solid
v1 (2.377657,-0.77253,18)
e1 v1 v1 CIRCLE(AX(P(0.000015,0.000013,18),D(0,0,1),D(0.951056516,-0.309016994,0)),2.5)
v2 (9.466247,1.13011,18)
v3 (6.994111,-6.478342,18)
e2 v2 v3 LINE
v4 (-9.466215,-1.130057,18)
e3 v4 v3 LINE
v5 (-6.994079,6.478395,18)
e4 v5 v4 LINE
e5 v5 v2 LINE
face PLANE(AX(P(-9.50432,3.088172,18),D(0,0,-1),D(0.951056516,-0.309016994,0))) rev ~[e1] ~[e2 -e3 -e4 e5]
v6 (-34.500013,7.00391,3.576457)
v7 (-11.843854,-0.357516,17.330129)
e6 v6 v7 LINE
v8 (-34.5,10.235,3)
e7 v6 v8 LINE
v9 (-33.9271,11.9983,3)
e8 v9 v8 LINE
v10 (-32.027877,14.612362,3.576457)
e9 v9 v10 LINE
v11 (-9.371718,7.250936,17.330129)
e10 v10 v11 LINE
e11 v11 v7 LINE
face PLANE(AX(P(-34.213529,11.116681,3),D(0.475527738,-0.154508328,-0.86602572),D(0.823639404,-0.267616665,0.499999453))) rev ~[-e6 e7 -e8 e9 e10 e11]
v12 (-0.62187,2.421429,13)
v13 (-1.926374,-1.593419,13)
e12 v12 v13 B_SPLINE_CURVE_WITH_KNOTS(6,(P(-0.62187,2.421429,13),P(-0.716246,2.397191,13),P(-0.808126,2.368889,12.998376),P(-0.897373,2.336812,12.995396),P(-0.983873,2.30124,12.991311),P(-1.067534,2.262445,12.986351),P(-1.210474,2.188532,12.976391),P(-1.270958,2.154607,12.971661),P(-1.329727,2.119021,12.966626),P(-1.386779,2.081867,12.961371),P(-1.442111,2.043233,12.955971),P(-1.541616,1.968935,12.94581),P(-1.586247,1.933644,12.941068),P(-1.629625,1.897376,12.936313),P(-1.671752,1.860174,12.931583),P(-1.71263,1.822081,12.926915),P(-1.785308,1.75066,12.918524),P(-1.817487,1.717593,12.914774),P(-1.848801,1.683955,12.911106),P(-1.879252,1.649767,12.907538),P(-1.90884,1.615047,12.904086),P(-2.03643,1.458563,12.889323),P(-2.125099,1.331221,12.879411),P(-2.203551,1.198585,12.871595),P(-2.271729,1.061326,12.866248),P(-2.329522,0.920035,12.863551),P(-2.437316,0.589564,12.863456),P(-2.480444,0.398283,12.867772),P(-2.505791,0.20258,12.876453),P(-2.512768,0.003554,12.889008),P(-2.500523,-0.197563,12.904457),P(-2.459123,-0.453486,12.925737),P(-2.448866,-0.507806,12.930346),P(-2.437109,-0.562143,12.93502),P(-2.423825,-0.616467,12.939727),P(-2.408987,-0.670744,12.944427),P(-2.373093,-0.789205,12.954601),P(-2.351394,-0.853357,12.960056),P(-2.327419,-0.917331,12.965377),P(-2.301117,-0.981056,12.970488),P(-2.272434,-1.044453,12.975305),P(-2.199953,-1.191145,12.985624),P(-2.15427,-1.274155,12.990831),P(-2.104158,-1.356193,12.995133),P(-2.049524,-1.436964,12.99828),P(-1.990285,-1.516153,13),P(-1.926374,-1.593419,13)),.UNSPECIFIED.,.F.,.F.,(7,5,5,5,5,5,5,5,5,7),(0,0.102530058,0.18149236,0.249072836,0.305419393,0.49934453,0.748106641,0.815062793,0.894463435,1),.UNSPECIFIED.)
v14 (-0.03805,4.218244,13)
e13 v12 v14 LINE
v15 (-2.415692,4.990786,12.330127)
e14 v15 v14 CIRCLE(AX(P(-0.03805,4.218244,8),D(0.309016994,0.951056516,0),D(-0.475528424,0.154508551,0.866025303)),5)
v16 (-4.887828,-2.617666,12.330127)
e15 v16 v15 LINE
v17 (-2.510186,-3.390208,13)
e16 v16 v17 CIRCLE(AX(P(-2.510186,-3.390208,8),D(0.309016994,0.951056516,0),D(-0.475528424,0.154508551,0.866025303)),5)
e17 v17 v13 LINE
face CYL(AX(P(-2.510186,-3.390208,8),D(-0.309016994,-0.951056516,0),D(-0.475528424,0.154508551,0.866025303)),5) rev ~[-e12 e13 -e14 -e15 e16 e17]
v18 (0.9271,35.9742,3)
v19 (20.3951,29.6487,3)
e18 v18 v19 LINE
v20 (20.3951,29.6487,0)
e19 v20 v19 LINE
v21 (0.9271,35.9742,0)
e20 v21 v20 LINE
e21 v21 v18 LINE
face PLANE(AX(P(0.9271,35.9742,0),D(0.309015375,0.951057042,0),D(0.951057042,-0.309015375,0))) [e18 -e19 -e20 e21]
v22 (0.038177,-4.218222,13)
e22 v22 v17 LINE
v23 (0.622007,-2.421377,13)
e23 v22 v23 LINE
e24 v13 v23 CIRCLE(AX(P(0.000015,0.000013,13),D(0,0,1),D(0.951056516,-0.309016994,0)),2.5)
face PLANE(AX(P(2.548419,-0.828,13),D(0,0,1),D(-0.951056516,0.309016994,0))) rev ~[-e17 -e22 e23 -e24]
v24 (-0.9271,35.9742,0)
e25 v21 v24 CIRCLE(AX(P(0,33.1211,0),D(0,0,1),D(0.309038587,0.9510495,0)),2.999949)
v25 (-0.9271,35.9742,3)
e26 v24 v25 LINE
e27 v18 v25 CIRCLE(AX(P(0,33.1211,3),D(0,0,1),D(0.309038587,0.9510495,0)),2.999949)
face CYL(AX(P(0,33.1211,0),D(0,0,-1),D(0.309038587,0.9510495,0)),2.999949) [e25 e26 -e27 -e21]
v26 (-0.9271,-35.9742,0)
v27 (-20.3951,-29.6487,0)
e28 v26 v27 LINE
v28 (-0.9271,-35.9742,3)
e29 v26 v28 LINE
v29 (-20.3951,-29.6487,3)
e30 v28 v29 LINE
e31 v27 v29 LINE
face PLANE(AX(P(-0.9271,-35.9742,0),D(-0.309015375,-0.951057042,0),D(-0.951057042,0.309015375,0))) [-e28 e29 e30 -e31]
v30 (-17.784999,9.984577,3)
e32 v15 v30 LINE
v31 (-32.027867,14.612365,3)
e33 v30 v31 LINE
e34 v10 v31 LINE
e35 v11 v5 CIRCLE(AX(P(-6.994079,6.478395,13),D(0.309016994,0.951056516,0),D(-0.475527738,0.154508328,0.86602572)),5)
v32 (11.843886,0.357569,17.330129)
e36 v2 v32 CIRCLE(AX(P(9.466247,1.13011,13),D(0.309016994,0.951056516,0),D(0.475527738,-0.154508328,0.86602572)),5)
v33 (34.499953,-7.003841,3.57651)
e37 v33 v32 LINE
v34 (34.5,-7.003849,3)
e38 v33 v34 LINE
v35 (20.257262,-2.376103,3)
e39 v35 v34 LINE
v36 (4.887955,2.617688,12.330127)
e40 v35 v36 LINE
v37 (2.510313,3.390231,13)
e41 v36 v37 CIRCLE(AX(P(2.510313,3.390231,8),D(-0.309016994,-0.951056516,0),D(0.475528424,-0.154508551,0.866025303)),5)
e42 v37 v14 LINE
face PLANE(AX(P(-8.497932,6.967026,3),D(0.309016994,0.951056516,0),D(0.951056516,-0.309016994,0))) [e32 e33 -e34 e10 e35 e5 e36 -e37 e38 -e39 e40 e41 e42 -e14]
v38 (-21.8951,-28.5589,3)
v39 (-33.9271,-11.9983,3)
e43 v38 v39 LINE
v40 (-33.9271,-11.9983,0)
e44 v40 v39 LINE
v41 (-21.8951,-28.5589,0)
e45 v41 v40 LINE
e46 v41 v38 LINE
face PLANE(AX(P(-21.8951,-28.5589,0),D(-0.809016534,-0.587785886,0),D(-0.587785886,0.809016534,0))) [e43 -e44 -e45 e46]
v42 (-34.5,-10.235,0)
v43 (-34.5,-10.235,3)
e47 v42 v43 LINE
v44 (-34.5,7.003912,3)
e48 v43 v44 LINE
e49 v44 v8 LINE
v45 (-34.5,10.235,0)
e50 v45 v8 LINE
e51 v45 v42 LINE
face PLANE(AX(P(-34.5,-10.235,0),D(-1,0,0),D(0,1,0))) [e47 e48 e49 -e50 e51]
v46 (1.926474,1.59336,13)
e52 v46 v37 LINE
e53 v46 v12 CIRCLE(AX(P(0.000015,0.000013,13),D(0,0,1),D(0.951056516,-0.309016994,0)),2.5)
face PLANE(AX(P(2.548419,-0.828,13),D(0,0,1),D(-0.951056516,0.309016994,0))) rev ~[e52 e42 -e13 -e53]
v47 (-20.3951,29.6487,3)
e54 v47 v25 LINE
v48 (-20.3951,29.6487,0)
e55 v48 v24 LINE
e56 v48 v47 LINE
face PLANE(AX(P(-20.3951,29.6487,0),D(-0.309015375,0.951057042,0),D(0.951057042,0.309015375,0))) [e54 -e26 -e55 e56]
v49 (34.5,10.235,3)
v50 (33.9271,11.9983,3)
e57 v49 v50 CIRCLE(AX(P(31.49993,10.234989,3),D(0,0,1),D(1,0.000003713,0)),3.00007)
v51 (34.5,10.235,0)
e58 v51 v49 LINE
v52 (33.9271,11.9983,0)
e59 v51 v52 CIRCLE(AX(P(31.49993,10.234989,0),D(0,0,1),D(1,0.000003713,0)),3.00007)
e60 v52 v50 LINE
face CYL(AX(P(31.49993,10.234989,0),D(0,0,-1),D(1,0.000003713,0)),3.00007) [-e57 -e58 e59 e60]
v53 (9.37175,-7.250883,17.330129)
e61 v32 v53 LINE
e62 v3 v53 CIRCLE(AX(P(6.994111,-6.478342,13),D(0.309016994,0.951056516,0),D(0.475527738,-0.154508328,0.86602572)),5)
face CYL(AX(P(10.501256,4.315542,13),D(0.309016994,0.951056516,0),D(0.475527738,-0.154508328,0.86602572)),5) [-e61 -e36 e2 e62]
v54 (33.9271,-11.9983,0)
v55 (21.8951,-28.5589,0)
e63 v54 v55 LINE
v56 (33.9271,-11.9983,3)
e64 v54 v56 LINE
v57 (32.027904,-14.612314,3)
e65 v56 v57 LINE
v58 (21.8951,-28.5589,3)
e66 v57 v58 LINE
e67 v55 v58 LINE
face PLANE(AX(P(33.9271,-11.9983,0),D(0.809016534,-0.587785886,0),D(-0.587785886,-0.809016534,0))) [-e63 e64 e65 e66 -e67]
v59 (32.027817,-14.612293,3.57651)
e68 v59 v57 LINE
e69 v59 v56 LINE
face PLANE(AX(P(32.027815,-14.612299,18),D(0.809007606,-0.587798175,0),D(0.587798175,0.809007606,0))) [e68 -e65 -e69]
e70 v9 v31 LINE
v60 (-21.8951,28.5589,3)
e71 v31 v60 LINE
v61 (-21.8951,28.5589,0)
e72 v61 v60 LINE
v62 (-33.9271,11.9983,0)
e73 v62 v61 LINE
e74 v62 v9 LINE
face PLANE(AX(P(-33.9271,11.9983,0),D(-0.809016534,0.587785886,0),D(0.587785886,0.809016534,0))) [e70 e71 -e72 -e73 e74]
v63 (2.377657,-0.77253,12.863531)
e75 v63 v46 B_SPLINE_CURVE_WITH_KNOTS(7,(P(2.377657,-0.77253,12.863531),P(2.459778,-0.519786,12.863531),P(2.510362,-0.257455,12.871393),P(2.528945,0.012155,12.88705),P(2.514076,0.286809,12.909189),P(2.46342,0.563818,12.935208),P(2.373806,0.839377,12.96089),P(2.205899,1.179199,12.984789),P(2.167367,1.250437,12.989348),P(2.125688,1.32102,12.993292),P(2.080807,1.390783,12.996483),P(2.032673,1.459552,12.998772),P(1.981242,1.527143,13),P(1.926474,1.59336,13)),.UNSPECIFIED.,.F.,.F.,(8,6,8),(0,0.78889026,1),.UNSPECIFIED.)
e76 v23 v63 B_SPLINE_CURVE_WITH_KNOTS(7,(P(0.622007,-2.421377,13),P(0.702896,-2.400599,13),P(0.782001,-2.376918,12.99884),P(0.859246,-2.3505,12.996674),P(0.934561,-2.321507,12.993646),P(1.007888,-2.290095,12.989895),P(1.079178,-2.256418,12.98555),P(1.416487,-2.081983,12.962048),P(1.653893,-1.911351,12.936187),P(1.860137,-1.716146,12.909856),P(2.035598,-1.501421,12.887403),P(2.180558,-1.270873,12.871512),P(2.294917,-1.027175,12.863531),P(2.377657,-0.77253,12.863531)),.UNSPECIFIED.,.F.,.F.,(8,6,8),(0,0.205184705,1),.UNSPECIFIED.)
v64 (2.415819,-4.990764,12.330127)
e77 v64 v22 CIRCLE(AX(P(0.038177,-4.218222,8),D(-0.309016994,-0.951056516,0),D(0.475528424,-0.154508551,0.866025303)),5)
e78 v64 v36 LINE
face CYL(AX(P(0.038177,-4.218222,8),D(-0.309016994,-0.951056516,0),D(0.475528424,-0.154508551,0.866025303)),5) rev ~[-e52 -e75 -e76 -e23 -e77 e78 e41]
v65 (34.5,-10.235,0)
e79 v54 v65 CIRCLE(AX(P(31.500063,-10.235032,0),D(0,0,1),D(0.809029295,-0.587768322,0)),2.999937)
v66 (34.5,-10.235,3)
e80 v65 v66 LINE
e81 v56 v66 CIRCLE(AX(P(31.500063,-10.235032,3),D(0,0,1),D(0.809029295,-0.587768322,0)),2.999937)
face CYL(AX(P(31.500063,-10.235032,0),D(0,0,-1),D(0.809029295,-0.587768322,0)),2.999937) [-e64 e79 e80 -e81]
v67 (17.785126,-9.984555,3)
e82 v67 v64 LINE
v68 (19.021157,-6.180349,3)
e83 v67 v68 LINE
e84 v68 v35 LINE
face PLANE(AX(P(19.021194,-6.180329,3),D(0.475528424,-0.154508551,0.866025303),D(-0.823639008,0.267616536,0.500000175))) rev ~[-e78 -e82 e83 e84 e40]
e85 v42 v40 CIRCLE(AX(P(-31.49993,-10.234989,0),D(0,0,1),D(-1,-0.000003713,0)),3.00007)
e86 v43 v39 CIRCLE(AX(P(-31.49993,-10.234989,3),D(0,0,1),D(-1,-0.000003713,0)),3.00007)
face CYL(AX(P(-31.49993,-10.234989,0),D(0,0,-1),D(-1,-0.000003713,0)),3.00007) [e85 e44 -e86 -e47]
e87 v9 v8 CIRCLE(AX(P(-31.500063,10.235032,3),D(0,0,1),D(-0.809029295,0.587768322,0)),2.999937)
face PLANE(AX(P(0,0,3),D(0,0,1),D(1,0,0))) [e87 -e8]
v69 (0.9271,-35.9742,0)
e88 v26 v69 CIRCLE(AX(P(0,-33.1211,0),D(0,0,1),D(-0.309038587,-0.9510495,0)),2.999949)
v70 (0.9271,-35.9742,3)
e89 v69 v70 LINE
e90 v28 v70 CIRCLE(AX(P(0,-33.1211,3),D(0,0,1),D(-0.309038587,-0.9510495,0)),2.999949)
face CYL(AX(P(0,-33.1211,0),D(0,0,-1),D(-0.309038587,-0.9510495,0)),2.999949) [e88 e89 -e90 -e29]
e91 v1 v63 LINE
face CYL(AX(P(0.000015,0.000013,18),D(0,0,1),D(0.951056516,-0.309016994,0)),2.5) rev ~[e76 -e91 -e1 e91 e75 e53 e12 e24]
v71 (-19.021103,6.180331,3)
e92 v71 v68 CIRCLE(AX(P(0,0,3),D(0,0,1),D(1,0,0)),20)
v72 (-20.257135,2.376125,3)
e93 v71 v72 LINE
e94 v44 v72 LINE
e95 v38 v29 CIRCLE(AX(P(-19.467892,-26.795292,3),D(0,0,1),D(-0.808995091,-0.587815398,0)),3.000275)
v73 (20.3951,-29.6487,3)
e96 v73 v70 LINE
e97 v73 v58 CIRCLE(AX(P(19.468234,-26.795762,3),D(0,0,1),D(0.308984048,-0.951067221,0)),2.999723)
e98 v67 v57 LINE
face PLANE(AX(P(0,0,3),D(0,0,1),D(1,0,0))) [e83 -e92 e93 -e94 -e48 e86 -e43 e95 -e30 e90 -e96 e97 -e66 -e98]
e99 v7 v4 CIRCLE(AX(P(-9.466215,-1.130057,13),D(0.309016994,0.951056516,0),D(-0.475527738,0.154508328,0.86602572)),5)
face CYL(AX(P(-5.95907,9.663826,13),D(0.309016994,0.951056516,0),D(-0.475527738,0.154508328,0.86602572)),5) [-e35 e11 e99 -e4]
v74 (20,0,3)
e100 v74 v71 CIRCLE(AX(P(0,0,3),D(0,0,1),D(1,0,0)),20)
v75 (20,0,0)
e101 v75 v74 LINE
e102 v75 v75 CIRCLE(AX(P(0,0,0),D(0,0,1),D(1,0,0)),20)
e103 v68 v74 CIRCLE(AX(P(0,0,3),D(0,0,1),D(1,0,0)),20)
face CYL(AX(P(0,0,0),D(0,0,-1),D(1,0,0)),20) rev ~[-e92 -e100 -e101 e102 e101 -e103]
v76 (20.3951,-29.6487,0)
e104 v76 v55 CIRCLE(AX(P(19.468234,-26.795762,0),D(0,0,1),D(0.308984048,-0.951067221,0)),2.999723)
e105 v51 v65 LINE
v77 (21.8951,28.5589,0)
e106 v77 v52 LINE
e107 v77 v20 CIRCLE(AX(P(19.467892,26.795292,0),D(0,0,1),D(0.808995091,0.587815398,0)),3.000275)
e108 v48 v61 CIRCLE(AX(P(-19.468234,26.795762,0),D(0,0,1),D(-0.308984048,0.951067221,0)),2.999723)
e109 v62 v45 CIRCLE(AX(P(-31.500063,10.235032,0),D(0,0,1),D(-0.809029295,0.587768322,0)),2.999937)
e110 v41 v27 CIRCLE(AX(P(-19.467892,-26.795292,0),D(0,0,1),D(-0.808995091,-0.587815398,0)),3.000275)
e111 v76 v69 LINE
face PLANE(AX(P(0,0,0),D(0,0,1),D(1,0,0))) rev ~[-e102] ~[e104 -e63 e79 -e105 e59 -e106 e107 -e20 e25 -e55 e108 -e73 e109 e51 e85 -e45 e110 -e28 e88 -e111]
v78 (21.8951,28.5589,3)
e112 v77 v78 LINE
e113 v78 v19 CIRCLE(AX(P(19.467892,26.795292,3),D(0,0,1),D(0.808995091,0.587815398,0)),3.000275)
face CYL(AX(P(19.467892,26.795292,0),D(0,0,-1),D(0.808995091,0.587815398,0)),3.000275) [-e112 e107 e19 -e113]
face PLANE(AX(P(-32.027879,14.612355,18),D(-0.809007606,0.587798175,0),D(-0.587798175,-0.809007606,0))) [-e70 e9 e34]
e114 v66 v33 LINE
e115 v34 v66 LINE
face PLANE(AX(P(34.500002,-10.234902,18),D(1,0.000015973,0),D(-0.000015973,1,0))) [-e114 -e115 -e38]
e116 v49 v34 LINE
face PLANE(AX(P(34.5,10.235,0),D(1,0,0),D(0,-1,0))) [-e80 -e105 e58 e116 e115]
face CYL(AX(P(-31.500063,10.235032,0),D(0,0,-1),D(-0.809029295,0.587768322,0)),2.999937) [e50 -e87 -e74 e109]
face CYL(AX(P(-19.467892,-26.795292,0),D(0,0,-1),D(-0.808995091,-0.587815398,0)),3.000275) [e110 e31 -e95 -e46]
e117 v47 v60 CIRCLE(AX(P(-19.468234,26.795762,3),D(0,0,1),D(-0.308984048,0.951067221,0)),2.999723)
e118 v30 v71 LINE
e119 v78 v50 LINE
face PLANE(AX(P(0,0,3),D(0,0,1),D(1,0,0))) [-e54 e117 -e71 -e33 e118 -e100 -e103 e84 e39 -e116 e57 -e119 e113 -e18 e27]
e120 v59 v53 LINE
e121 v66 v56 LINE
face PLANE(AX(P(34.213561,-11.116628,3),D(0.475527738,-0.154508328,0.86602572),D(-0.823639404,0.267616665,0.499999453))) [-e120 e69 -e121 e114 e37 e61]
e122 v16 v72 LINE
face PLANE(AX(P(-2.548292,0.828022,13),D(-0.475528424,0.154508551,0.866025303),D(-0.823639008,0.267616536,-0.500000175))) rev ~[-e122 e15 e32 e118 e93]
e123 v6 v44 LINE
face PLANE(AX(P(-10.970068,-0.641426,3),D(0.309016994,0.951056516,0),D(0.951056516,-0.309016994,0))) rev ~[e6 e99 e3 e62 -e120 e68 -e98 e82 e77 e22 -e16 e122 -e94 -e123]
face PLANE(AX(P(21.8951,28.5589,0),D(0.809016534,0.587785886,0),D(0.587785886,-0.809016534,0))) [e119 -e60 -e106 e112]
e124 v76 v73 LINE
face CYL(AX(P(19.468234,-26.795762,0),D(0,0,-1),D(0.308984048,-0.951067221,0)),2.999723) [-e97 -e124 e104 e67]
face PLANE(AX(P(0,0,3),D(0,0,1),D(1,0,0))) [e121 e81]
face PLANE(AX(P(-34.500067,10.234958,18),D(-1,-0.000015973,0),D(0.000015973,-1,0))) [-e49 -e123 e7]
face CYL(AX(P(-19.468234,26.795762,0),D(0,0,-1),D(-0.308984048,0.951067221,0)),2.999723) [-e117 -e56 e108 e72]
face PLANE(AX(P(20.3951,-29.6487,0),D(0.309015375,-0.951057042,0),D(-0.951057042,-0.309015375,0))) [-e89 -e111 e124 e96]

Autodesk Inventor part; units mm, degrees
ref_plane "YZ Plane" through (0, 0, 0) normal (1, 0, 0) x (0, 1, 0)
ref_plane "XZ Plane" through (0, 0, 0) normal (0, 1, 0) x (-1, 0, 0)
ref_plane "XY Plane" through (0, 0, 0) normal (0, 0, 1) x (1, 0, 0)
ref_plane "Arbeitsebene1" through (0, 0, 0) normal (0, 0, 1) x (1, 0, 0)
sketch "Skizze1" plane through (0, 0, 0) normal (0, 0, 1) x (1, 0, 0)
  arc A0 (-34.5, -10.235) -> (-33.9271, -11.9983) centre (-31.5, -10.235) ccw projected
  line L0 (-21.8951, -28.5589) -> (-33.9271, -11.9983) projected
  arc A1 (-21.8951, -28.5589) -> (-20.3951, -29.6487) centre (-19.4681, -26.7955) ccw projected
  line L1 (-0.9271, -35.9742) -> (-20.3951, -29.6487) projected
  arc A2 (-0.9271, -35.9742) -> (0.9271, -35.9742) centre (0, -33.1211) ccw projected
  line L2 (20.3951, -29.6487) -> (0.9271, -35.9742) projected
  arc A3 (20.3951, -29.6487) -> (21.8951, -28.5589) centre (19.4681, -26.7955) ccw projected
  line L3 (33.9271, -11.9983) -> (21.8951, -28.5589) projected
  arc A4 (33.9271, -11.9983) -> (34.5, -10.235) centre (31.5, -10.235) ccw projected
  line L4 (34.5, 10.235) -> (34.5, -10.235) projected
  arc A5 (34.5, 10.235) -> (33.9271, 11.9983) centre (31.5, 10.235) ccw projected
  line L5 (21.8951, 28.5589) -> (33.9271, 11.9983) projected
  arc A6 (21.8951, 28.5589) -> (20.3951, 29.6487) centre (19.4681, 26.7955) ccw projected
  line L6 (0.9271, 35.9742) -> (20.3951, 29.6487) projected
  arc A7 (0.9271, 35.9742) -> (-0.9271, 35.9742) centre (0, 33.1211) ccw projected
  line L7 (-20.3951, 29.6487) -> (-0.9271, 35.9742) projected
  arc A8 (-20.3951, 29.6487) -> (-21.8951, 28.5589) centre (-19.4681, 26.7955) ccw projected
  line L8 (-33.9271, 11.9983) -> (-21.8951, 28.5589) projected
  arc A9 (-33.9271, 11.9983) -> (-34.5, 10.235) centre (-31.5, 10.235) ccw projected
  line L9 (-34.5, -10.235) -> (-34.5, 10.235) projected
  circle A10 centre (0, 0) radius 20
  dimension "d0" = 40
extrude "Extrusion1" add sketch "Skizze1" along normal blind 3
ref_plane "Arbeitsebene2" through (-9.734, 3.1628, 3) normal (0.309017, 0.9510565, 0) x (0.9510565, -0.309017, 0)
sketch "Skizze2" plane through (-9.734, 3.1628, 3) normal (0.309017, 0.9510565, 0) x (0.9510565, -0.309017, 0)
  line L0 (46.2092, 3) -> (46.2092, 0) projected
  line L1 (-25.7393, 3) -> (-25.7393, 0) projected
  line L2 (30.235, 0) -> (-9.765, 0) projected
  line L3 (46.2092, 0) -> (20.2284, -15)
  line L4 (46.2092, 0) -> (76.2092, 0) construction
  line L5 (-25.7393, 0) -> (-19.4137, 0) projected
  line L6 (-25.7393, 0) -> (0.2415, -15)
  line L7 (0.2415, -15) -> (20.2284, -15)
  line L8 (30.235, 0) -> (12.9145, -10)
  line L9 (12.9145, -10) -> (7.5555, -10)
  line L10 (7.5555, -10) -> (-9.765, 0)
  line L11 (-25.7393, 0) -> (-9.765, 0)
  line L12 (30.235, 0) -> (46.2092, 0)
  point P0 (10.235, 3)
  point P1 (-19.4137, 0)
  dimension "d3" = 30
  dimension "d4" = 150
  dimension "d5" = 30
  dimension "d6" = 5
extrude "Extrusion2" add sketch "Skizze2" along normal mid plane 8 contours L12 L3 L7 L6 L5 L11 L10 L9 L8
sketch "Skizze3" plane through (-8.2683, 6.8924, 18) normal (0, 0, 1) x (0.9510565, -0.309017, 0)
  line L0 (44.9692, -8) -> (29.9935, -8) projected
  line L1 (29.9935, -8) -> (29.9935, -4) projected
  arc A0 (-10.0065, -4) -> (29.9935, -4) centre (9.9935, -4) ccw projected
  line L2 (-10.0065, -4) -> (-10.0065, -8) projected
  line L3 (-10.0065, -8) -> (-24.9823, -8) projected
  line L4 (-24.9823, -8) -> (-19.6552, -24.3951) projected
  arc A1 (-19.6552, -24.3951) -> (-18.5654, -25.8951) centre (-16.802, -23.4681) ccw projected
  line L5 (-18.5654, -25.8951) -> (-2.0049, -37.9271) projected
  arc A2 (-2.0049, -37.9271) -> (-0.2415, -38.5) centre (-0.2415, -35.5) ccw projected
  line L6 (-0.2415, -38.5) -> (20.2284, -38.5) projected
  arc A3 (20.2284, -38.5) -> (21.9918, -37.9271) centre (20.2284, -35.5) ccw projected
  line L7 (21.9918, -37.9271) -> (38.5523, -25.8951) projected
  arc A4 (38.5523, -25.8951) -> (39.6421, -24.3951) centre (36.789, -23.4681) ccw projected
  line L8 (39.6421, -24.3951) -> (44.9692, -8) projected
  line L9 (44.9692, -8) -> (45.9677, -4.9271) projected
  line L10 (29.9935, -4) -> (29.9935, 0) projected
  line L11 (29.9935, 0) -> (44.9692, 0) projected
  line L12 (44.9692, 0) -> (39.6421, 16.3951) projected
  arc A5 (39.6421, 16.3951) -> (38.5523, 17.8951) centre (36.789, 15.4681) ccw projected
  line L13 (38.5523, 17.8951) -> (21.9918, 29.9271) projected
  arc A6 (21.9918, 29.9271) -> (20.2284, 30.5) centre (20.2284, 27.5) ccw projected
  line L14 (20.2284, 30.5) -> (-0.2415, 30.5) projected
  arc A7 (-0.2415, 30.5) -> (-2.0049, 29.9271) centre (-0.2415, 27.5) ccw projected
  line L15 (-2.0049, 29.9271) -> (-18.5654, 17.8951) projected
  arc A8 (-18.5654, 17.8951) -> (-19.6552, 16.3951) centre (-16.802, 15.4681) ccw projected
  line L16 (-19.6552, 16.3951) -> (-24.9823, 0) projected
  line L17 (-24.9823, 0) -> (-10.0065, 0) projected
  line L18 (-10.0065, 0) -> (-10.0065, -4) projected
  arc A9 (29.9935, -4) -> (-10.0065, -4) centre (9.9935, -4) ccw projected
  line L19 (-24.9823, 0) -> (-25.9808, -3.0729) projected
  line L20 (-25.9808, -4.9271) -> (-24.9823, -8) projected
  line L21 (-25.9808, -4.9271) -> (-25.9808, -3.0729) projected
  line L22 (45.9677, -3.0729) -> (44.9692, 0) projected
  arc A10 (45.9677, -4.9271) -> (45.9677, -3.0729) centre (43.1145, -4) ccw projected
  circle A11 centre (9.9935, -4) radius 2.5
  line L23 (0, -8) -> (0, 0) projected
  line L24 (-25.9808, 0) -> (0, 0) projected
  line L25 (-25.9808, -3.0729) -> (-25.9808, 0) projected
  line L26 (-25.9808, -4.9271) -> (-25.9808, -3.0729) projected
  line L27 (-25.9808, -8) -> (-25.9808, -4.9271) projected
  line L28 (0, -8) -> (-25.9808, -8) projected
  line L29 (45.9677, -8) -> (45.9677, -4.9271) projected
  line L30 (45.9677, -3.0729) -> (45.9677, -4.9271) projected
  line L31 (45.9677, -3.0729) -> (45.9677, 0) projected
  line L32 (19.9869, 0) -> (45.9677, 0) projected
  line L33 (19.9869, -8) -> (19.9869, 0) projected
  line L34 (45.9677, -8) -> (19.9869, -8) projected
  point P0 (-24.9823, 0)
  point P1 (-25.9808, -4.9271)
  point P2 (-24.9823, -8)
  point P3 (45.9677, -3.0729)
  point P4 (44.9692, 0)
  point P5 (45.9677, -4.9271)
  point P6 (44.9692, -8)
  dimension "d9" = 5
extrude "Extrusion3" cut sketch "Skizze3" against normal through all contours L9 L29 L34 | L22 L32 L31 | L28 L27 L20 | L19 L25 L24 | A11
fillet "Rundung1" radius 5 4 edges at (9.5044, -3.0882, 18) (-9.5044, 3.0882, 18) (2.5483, -0.828, 13) (-2.5483, 0.828, 13)
properties part number "Anglerfish_Lightplate"
